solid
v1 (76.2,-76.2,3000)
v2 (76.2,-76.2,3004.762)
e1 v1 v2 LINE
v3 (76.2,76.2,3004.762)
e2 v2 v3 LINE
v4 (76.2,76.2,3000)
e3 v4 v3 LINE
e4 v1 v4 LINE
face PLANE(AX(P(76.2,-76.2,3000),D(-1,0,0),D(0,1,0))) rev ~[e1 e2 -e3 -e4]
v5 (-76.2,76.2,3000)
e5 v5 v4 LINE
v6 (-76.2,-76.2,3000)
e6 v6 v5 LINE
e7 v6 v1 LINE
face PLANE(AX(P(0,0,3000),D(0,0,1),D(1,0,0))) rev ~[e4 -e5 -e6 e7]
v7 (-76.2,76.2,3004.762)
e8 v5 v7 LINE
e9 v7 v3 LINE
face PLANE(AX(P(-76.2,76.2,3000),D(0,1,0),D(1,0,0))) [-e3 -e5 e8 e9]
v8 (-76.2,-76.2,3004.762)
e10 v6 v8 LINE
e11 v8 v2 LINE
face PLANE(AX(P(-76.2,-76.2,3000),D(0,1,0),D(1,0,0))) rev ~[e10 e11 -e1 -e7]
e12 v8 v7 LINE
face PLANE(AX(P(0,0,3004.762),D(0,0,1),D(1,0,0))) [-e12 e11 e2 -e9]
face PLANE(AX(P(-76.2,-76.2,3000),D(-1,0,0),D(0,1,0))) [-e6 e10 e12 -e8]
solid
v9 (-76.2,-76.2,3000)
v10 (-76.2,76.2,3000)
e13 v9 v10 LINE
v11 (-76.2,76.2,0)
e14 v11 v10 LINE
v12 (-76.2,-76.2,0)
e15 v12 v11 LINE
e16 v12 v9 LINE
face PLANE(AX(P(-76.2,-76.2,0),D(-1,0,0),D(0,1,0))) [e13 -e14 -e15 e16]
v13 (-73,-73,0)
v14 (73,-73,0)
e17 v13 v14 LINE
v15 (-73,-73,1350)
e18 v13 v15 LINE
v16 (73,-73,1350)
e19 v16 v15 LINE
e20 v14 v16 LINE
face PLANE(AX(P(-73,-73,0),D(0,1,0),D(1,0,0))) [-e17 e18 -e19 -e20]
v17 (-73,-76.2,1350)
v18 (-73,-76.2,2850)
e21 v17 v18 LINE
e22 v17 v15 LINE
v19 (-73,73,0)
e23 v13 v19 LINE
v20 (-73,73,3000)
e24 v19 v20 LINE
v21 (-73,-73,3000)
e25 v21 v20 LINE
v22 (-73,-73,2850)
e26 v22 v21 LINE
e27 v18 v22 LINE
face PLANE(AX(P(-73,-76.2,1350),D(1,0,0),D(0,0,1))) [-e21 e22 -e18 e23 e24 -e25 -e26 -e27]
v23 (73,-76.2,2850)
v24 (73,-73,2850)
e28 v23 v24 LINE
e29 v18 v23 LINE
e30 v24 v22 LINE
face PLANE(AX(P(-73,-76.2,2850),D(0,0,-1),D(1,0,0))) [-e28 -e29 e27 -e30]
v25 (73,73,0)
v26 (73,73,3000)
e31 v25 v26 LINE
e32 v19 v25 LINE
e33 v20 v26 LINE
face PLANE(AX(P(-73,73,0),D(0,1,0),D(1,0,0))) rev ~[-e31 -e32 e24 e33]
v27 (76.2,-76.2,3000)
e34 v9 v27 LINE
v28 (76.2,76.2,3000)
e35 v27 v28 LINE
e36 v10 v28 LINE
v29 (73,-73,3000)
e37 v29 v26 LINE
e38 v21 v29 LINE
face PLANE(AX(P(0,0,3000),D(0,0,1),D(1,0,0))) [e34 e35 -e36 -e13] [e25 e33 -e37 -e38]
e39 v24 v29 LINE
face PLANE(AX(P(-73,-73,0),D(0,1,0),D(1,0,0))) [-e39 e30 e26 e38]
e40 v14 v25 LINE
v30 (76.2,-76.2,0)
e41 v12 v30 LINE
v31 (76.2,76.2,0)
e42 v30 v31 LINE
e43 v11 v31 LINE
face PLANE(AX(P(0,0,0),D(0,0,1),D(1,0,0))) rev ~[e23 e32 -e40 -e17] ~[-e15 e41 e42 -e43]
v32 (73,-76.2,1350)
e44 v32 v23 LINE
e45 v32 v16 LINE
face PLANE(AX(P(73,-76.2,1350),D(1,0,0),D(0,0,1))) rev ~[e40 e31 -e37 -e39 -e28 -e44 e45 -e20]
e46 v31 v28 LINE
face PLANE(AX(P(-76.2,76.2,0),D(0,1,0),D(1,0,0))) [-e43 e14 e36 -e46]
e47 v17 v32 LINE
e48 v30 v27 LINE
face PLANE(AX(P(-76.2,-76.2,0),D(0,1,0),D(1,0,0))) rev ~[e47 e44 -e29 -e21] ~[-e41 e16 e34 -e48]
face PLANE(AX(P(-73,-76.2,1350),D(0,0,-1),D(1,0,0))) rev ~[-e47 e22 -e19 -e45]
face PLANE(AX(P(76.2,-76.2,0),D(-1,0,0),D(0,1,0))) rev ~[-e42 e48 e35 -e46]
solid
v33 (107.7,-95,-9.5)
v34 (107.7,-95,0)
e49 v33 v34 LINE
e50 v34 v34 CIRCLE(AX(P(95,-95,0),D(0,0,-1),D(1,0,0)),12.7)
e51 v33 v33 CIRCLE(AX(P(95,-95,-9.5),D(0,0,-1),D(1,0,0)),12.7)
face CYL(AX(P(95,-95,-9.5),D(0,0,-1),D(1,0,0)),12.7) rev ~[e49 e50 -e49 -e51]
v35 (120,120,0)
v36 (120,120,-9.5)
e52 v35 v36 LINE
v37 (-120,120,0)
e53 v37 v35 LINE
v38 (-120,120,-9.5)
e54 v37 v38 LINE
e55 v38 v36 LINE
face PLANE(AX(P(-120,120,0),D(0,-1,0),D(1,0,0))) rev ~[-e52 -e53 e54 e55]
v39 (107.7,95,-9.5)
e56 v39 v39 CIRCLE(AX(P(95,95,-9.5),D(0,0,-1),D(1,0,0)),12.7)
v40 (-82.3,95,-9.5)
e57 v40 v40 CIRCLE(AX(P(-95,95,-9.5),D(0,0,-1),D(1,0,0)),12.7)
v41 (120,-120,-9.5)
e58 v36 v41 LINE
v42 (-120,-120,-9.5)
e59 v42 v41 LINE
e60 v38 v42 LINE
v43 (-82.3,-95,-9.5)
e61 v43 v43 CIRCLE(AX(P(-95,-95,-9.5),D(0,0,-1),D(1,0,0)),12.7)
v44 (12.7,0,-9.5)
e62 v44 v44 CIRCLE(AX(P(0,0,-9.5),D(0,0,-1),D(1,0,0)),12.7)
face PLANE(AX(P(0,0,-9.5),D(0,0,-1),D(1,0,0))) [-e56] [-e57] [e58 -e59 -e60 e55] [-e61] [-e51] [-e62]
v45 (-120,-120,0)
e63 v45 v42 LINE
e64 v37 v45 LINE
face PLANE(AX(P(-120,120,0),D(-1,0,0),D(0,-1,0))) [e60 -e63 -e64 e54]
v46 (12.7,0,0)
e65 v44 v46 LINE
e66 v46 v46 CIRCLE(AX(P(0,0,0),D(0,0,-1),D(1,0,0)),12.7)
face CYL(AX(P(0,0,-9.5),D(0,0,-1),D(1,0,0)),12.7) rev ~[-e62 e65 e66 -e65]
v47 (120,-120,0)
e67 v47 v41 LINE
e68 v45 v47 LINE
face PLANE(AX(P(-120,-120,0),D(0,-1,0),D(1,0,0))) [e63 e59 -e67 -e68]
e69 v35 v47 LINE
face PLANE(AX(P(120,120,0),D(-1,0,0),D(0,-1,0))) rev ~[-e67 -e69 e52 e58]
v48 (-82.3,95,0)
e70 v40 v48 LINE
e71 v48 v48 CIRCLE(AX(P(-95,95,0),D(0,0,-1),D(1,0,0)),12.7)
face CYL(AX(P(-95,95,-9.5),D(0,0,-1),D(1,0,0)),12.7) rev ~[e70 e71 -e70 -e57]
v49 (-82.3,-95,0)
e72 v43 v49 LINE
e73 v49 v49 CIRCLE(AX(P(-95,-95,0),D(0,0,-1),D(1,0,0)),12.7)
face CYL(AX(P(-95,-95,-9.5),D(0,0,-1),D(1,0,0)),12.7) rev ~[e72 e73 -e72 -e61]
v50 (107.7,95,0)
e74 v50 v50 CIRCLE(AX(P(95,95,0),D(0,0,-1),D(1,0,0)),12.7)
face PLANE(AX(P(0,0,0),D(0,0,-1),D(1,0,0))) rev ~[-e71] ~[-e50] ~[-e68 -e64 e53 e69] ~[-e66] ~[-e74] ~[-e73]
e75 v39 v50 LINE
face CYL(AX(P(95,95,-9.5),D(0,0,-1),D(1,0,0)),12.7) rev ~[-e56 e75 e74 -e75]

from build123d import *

# Parameters (mm, degrees)
F0_W      = 152.4
F0_H      = 152.4
F0_W_2    = 146
F0_H_2    = 146
F1_DEPTH  = 3000
F2_W      = 146
F2_H      = 1500
F3_DEPTH  = 148.8
F6_W      = 152.4
F6_H      = 152.4
F6_W_2    = 146
F6_H_2    = 146
F7_DEPTH  = 4.762
F8_W      = 240
F8_H      = 240
F9_DEPTH  = 9.5
F10_R     = 12.7
F11_DEPTH = 9.5


# Not quite as in the source:
# - the program builds the solid bodies; features that only make, move or delete a surface that nothing else refers to are left out


with BuildPart() as f1:
    # F0 (on Top) → F1 (new body)
    with BuildSketch(Plane.XY):
        Rectangle(F0_W, F0_H)
        Rectangle(F0_W_2, F0_H_2, mode=Mode.SUBTRACT)
    extrude(amount=F1_DEPTH)

    # F2 (on face) → F3 (cut)
    with BuildSketch(Plane.XZ.offset(76.2)):
        with Locations((0, 2100)):
            Rectangle(F2_W, F2_H)
    extrude(amount=-F3_DEPTH, mode=Mode.SUBTRACT)


with BuildPart() as f7:
    # F6 (on face) → F7 (new body)
    with BuildSketch(Plane.XY.offset(3000)):
        Rectangle(F6_W, F6_H)
        Rectangle(F6_W_2, F6_H_2, mode=Mode.SUBTRACT)
        Rectangle(F6_W_2, F6_H_2)
    extrude(amount=F7_DEPTH)


with BuildPart() as f9:
    # F8 (on face) → F9 (new body)
    with BuildSketch(Plane(origin=(0, 0, 0), x_dir=(1, 0, 0), z_dir=(0, 0, -1))):
        Rectangle(F8_W, F8_H)
    extrude(amount=F9_DEPTH)

    # F10 (on face) → F11 (cut, through all)
    with BuildSketch(Plane(origin=(0, 0, -9.5), x_dir=(1, 0, 0), z_dir=(0, 0, -1))):
        with Locations((-95, 95)):
            Circle(F10_R)
        with Locations((-95, -95)):
            Circle(F10_R)
        with Locations((95, 95)):
            Circle(F10_R)
        with Locations((95, -95)):
            Circle(F10_R)
        Circle(F10_R)
    extrude(amount=-F11_DEPTH, mode=Mode.SUBTRACT)


solid = Compound([f1.part, f7.part, f9.part])
